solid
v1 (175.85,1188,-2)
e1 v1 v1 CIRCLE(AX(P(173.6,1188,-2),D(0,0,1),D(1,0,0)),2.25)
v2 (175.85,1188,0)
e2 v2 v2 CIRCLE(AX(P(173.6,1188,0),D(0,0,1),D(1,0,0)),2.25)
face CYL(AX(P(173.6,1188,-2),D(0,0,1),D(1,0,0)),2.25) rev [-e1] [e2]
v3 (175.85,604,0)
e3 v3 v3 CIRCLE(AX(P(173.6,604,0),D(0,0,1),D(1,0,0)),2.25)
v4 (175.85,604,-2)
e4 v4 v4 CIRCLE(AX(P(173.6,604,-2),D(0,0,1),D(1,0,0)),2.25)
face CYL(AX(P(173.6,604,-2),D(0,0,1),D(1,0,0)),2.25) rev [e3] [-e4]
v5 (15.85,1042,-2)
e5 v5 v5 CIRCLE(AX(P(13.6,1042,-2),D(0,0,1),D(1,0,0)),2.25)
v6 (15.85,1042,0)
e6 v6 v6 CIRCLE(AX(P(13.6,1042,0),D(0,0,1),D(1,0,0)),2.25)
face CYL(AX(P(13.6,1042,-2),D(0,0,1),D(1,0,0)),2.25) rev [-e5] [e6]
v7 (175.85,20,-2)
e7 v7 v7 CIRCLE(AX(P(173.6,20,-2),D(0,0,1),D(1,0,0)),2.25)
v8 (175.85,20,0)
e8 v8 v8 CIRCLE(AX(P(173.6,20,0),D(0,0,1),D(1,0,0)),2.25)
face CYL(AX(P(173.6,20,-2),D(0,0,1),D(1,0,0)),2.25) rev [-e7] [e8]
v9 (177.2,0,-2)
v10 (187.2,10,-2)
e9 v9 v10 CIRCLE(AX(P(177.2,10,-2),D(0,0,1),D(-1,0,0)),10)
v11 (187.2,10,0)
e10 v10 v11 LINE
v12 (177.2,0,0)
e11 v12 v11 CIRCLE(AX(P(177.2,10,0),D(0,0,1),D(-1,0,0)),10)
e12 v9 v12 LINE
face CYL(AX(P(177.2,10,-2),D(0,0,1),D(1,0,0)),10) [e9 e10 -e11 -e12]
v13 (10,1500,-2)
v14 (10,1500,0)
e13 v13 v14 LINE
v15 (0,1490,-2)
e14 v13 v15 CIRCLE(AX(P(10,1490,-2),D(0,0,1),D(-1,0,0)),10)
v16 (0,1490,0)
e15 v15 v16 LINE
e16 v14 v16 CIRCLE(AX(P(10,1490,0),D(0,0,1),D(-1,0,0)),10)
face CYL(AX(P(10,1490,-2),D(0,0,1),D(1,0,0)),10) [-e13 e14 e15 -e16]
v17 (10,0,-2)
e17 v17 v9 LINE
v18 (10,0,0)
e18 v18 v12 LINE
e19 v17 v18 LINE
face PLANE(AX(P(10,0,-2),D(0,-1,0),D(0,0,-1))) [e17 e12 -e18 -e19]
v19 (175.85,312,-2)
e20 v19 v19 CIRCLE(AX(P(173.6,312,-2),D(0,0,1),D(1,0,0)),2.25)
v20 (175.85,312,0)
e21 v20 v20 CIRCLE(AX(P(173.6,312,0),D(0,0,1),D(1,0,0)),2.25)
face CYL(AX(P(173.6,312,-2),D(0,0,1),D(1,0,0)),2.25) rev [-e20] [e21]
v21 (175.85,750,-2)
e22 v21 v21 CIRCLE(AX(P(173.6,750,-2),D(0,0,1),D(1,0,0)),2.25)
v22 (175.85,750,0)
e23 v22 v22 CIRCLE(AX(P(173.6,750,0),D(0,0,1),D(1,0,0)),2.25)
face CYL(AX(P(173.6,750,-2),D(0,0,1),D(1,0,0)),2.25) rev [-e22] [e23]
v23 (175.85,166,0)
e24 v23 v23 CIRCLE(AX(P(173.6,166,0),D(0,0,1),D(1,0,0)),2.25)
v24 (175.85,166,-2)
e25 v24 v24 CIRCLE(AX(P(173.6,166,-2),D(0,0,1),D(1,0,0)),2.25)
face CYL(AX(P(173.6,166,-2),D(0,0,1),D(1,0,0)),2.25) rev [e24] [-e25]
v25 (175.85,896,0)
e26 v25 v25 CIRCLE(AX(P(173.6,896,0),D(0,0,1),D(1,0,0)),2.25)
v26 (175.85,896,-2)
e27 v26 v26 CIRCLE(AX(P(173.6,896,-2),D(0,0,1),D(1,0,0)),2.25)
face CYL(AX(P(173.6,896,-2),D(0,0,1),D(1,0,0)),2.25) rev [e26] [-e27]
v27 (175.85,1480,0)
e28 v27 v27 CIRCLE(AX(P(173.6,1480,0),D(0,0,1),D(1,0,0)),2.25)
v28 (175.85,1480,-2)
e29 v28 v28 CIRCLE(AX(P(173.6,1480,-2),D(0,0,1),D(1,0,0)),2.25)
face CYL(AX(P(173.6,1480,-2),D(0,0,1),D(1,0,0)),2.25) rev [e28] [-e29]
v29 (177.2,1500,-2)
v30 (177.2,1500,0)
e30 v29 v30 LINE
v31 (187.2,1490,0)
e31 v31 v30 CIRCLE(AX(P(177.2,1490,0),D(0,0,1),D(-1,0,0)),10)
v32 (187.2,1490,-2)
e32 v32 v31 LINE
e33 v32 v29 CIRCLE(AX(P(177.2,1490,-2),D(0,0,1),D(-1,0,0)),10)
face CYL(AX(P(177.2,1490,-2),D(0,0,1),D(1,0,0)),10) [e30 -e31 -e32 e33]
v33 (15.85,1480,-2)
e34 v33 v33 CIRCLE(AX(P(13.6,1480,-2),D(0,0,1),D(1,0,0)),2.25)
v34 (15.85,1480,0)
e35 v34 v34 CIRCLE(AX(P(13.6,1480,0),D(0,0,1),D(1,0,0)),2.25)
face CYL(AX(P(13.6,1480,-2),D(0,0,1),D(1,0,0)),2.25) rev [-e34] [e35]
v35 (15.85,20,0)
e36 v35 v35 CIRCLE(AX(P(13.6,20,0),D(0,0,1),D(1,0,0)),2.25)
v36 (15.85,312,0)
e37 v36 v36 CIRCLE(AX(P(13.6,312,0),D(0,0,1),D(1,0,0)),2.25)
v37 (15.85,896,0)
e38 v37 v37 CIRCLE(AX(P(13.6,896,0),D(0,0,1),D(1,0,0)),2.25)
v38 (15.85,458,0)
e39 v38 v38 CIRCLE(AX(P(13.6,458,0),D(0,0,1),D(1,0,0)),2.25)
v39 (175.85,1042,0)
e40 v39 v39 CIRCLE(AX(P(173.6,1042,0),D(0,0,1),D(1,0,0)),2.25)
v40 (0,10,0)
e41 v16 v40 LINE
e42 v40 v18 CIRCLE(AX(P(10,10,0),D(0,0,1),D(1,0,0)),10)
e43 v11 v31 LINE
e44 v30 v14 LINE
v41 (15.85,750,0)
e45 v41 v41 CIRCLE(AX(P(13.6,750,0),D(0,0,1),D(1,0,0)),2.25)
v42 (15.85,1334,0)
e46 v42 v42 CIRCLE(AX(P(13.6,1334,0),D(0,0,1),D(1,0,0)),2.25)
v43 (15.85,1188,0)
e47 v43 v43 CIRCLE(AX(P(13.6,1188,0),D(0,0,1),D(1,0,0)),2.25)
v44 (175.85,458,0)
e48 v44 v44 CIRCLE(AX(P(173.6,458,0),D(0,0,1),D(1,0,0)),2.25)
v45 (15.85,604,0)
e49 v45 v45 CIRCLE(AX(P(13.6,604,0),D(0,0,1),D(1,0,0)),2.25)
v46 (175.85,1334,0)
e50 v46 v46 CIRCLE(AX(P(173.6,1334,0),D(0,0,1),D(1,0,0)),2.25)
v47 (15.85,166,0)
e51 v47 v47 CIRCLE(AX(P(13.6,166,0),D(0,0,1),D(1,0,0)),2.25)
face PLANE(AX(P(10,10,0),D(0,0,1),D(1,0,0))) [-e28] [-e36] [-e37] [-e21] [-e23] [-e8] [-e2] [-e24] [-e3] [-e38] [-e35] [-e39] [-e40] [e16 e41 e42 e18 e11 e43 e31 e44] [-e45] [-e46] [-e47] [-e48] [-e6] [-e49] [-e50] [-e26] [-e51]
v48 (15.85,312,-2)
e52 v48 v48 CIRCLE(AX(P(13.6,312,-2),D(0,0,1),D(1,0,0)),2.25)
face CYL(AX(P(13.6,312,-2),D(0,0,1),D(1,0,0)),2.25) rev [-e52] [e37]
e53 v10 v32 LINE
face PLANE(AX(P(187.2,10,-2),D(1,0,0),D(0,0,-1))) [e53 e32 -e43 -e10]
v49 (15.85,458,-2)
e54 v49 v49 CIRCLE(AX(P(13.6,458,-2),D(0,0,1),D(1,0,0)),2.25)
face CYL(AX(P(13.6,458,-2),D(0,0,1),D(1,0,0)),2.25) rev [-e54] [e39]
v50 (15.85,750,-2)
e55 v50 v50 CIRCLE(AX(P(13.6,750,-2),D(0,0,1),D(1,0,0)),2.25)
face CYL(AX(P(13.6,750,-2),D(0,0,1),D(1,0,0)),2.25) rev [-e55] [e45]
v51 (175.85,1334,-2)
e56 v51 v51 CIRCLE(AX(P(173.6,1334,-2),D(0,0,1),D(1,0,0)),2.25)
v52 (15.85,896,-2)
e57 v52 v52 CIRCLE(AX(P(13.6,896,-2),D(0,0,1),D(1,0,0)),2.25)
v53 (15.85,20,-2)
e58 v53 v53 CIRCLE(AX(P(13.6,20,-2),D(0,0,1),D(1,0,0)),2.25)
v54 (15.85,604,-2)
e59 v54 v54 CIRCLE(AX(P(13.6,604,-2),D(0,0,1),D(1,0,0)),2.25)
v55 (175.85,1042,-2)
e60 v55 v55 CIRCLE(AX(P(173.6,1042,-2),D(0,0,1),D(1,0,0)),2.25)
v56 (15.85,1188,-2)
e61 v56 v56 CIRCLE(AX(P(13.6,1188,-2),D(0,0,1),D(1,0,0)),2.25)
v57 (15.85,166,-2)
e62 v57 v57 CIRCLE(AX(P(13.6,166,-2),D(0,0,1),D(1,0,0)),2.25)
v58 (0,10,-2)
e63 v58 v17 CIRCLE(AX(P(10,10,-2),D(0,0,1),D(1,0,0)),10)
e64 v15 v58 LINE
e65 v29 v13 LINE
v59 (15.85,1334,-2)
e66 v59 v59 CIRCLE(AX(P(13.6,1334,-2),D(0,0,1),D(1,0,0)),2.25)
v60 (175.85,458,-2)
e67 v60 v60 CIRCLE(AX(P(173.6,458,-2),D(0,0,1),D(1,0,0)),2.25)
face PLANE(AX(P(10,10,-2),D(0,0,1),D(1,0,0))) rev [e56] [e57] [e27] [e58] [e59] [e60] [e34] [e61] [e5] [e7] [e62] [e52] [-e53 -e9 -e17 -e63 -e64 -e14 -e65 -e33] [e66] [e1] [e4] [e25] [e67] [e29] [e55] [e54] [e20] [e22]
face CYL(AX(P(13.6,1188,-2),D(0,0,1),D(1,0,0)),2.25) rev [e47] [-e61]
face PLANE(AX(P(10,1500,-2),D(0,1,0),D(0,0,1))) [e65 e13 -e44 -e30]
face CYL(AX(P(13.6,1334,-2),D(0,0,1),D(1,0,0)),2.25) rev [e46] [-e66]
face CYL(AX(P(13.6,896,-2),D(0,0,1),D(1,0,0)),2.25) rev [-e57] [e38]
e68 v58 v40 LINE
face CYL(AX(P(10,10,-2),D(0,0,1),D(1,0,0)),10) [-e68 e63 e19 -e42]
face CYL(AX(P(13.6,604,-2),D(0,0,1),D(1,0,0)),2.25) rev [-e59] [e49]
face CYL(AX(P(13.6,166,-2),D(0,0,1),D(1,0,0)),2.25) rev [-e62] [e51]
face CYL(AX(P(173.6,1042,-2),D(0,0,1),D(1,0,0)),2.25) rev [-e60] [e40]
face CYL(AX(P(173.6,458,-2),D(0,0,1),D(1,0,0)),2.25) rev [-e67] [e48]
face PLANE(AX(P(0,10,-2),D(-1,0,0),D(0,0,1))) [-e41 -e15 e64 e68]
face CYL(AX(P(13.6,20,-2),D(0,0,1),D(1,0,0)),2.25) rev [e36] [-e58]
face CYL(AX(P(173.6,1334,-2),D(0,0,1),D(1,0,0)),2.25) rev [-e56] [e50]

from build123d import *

# Parameters (mm, degrees)
SKETCH1_R          = 2.25
BASE_FLANGE1_DEPTH = 2


# Sheet-metal steps are written as plain solids
with BuildPart() as part:
    # Sketch1 → Base-Flange1 (new body)
    with BuildSketch(Plane.XY):
        with BuildLine():
            Line((10, 0), (177.2, 0))
            ThreePointArc((177.2, 0), (184.271067812, 2.928932188), (187.2, 10))
            Line((187.2, 10), (187.2, 1490))
            ThreePointArc((187.2, 1490), (184.271067812, 1497.071067812), (177.2, 1500))
            Line((177.2, 1500), (10, 1500))
            ThreePointArc((10, 1500), (2.928932188, 1497.071067812), (0, 1490))
            Line((0, 1490), (0, 10))
            ThreePointArc((0, 10), (2.928932188, 2.928932188), (10, 0))
        make_face()
        with Locations((13.6, 1480)):
            Circle(SKETCH1_R, mode=Mode.SUBTRACT)
        with Locations((173.6, 1480)):
            Circle(SKETCH1_R, mode=Mode.SUBTRACT)
        with Locations((173.6, 1334)):
            Circle(SKETCH1_R, mode=Mode.SUBTRACT)
        with Locations((173.6, 1188)):
            Circle(SKETCH1_R, mode=Mode.SUBTRACT)
        with Locations((173.6, 1042)):
            Circle(SKETCH1_R, mode=Mode.SUBTRACT)
        with Locations((173.6, 896)):
            Circle(SKETCH1_R, mode=Mode.SUBTRACT)
        with Locations((173.6, 750)):
            Circle(SKETCH1_R, mode=Mode.SUBTRACT)
        with Locations((173.6, 604)):
            Circle(SKETCH1_R, mode=Mode.SUBTRACT)
        with Locations((173.6, 458)):
            Circle(SKETCH1_R, mode=Mode.SUBTRACT)
        with Locations((173.6, 312)):
            Circle(SKETCH1_R, mode=Mode.SUBTRACT)
        with Locations((173.6, 166)):
            Circle(SKETCH1_R, mode=Mode.SUBTRACT)
        with Locations((173.6, 20)):
            Circle(SKETCH1_R, mode=Mode.SUBTRACT)
        with Locations((13.6, 1334)):
            Circle(SKETCH1_R, mode=Mode.SUBTRACT)
        with Locations((13.6, 1188)):
            Circle(SKETCH1_R, mode=Mode.SUBTRACT)
        with Locations((13.6, 1042)):
            Circle(SKETCH1_R, mode=Mode.SUBTRACT)
        with Locations((13.6, 896)):
            Circle(SKETCH1_R, mode=Mode.SUBTRACT)
        with Locations((13.6, 750)):
            Circle(SKETCH1_R, mode=Mode.SUBTRACT)
        with Locations((13.6, 604)):
            Circle(SKETCH1_R, mode=Mode.SUBTRACT)
        with Locations((13.6, 458)):
            Circle(SKETCH1_R, mode=Mode.SUBTRACT)
        with Locations((13.6, 312)):
            Circle(SKETCH1_R, mode=Mode.SUBTRACT)
        with Locations((13.6, 166)):
            Circle(SKETCH1_R, mode=Mode.SUBTRACT)
        with Locations((13.6, 20)):
            Circle(SKETCH1_R, mode=Mode.SUBTRACT)
    extrude(amount=-BASE_FLANGE1_DEPTH)


solid = part.part
